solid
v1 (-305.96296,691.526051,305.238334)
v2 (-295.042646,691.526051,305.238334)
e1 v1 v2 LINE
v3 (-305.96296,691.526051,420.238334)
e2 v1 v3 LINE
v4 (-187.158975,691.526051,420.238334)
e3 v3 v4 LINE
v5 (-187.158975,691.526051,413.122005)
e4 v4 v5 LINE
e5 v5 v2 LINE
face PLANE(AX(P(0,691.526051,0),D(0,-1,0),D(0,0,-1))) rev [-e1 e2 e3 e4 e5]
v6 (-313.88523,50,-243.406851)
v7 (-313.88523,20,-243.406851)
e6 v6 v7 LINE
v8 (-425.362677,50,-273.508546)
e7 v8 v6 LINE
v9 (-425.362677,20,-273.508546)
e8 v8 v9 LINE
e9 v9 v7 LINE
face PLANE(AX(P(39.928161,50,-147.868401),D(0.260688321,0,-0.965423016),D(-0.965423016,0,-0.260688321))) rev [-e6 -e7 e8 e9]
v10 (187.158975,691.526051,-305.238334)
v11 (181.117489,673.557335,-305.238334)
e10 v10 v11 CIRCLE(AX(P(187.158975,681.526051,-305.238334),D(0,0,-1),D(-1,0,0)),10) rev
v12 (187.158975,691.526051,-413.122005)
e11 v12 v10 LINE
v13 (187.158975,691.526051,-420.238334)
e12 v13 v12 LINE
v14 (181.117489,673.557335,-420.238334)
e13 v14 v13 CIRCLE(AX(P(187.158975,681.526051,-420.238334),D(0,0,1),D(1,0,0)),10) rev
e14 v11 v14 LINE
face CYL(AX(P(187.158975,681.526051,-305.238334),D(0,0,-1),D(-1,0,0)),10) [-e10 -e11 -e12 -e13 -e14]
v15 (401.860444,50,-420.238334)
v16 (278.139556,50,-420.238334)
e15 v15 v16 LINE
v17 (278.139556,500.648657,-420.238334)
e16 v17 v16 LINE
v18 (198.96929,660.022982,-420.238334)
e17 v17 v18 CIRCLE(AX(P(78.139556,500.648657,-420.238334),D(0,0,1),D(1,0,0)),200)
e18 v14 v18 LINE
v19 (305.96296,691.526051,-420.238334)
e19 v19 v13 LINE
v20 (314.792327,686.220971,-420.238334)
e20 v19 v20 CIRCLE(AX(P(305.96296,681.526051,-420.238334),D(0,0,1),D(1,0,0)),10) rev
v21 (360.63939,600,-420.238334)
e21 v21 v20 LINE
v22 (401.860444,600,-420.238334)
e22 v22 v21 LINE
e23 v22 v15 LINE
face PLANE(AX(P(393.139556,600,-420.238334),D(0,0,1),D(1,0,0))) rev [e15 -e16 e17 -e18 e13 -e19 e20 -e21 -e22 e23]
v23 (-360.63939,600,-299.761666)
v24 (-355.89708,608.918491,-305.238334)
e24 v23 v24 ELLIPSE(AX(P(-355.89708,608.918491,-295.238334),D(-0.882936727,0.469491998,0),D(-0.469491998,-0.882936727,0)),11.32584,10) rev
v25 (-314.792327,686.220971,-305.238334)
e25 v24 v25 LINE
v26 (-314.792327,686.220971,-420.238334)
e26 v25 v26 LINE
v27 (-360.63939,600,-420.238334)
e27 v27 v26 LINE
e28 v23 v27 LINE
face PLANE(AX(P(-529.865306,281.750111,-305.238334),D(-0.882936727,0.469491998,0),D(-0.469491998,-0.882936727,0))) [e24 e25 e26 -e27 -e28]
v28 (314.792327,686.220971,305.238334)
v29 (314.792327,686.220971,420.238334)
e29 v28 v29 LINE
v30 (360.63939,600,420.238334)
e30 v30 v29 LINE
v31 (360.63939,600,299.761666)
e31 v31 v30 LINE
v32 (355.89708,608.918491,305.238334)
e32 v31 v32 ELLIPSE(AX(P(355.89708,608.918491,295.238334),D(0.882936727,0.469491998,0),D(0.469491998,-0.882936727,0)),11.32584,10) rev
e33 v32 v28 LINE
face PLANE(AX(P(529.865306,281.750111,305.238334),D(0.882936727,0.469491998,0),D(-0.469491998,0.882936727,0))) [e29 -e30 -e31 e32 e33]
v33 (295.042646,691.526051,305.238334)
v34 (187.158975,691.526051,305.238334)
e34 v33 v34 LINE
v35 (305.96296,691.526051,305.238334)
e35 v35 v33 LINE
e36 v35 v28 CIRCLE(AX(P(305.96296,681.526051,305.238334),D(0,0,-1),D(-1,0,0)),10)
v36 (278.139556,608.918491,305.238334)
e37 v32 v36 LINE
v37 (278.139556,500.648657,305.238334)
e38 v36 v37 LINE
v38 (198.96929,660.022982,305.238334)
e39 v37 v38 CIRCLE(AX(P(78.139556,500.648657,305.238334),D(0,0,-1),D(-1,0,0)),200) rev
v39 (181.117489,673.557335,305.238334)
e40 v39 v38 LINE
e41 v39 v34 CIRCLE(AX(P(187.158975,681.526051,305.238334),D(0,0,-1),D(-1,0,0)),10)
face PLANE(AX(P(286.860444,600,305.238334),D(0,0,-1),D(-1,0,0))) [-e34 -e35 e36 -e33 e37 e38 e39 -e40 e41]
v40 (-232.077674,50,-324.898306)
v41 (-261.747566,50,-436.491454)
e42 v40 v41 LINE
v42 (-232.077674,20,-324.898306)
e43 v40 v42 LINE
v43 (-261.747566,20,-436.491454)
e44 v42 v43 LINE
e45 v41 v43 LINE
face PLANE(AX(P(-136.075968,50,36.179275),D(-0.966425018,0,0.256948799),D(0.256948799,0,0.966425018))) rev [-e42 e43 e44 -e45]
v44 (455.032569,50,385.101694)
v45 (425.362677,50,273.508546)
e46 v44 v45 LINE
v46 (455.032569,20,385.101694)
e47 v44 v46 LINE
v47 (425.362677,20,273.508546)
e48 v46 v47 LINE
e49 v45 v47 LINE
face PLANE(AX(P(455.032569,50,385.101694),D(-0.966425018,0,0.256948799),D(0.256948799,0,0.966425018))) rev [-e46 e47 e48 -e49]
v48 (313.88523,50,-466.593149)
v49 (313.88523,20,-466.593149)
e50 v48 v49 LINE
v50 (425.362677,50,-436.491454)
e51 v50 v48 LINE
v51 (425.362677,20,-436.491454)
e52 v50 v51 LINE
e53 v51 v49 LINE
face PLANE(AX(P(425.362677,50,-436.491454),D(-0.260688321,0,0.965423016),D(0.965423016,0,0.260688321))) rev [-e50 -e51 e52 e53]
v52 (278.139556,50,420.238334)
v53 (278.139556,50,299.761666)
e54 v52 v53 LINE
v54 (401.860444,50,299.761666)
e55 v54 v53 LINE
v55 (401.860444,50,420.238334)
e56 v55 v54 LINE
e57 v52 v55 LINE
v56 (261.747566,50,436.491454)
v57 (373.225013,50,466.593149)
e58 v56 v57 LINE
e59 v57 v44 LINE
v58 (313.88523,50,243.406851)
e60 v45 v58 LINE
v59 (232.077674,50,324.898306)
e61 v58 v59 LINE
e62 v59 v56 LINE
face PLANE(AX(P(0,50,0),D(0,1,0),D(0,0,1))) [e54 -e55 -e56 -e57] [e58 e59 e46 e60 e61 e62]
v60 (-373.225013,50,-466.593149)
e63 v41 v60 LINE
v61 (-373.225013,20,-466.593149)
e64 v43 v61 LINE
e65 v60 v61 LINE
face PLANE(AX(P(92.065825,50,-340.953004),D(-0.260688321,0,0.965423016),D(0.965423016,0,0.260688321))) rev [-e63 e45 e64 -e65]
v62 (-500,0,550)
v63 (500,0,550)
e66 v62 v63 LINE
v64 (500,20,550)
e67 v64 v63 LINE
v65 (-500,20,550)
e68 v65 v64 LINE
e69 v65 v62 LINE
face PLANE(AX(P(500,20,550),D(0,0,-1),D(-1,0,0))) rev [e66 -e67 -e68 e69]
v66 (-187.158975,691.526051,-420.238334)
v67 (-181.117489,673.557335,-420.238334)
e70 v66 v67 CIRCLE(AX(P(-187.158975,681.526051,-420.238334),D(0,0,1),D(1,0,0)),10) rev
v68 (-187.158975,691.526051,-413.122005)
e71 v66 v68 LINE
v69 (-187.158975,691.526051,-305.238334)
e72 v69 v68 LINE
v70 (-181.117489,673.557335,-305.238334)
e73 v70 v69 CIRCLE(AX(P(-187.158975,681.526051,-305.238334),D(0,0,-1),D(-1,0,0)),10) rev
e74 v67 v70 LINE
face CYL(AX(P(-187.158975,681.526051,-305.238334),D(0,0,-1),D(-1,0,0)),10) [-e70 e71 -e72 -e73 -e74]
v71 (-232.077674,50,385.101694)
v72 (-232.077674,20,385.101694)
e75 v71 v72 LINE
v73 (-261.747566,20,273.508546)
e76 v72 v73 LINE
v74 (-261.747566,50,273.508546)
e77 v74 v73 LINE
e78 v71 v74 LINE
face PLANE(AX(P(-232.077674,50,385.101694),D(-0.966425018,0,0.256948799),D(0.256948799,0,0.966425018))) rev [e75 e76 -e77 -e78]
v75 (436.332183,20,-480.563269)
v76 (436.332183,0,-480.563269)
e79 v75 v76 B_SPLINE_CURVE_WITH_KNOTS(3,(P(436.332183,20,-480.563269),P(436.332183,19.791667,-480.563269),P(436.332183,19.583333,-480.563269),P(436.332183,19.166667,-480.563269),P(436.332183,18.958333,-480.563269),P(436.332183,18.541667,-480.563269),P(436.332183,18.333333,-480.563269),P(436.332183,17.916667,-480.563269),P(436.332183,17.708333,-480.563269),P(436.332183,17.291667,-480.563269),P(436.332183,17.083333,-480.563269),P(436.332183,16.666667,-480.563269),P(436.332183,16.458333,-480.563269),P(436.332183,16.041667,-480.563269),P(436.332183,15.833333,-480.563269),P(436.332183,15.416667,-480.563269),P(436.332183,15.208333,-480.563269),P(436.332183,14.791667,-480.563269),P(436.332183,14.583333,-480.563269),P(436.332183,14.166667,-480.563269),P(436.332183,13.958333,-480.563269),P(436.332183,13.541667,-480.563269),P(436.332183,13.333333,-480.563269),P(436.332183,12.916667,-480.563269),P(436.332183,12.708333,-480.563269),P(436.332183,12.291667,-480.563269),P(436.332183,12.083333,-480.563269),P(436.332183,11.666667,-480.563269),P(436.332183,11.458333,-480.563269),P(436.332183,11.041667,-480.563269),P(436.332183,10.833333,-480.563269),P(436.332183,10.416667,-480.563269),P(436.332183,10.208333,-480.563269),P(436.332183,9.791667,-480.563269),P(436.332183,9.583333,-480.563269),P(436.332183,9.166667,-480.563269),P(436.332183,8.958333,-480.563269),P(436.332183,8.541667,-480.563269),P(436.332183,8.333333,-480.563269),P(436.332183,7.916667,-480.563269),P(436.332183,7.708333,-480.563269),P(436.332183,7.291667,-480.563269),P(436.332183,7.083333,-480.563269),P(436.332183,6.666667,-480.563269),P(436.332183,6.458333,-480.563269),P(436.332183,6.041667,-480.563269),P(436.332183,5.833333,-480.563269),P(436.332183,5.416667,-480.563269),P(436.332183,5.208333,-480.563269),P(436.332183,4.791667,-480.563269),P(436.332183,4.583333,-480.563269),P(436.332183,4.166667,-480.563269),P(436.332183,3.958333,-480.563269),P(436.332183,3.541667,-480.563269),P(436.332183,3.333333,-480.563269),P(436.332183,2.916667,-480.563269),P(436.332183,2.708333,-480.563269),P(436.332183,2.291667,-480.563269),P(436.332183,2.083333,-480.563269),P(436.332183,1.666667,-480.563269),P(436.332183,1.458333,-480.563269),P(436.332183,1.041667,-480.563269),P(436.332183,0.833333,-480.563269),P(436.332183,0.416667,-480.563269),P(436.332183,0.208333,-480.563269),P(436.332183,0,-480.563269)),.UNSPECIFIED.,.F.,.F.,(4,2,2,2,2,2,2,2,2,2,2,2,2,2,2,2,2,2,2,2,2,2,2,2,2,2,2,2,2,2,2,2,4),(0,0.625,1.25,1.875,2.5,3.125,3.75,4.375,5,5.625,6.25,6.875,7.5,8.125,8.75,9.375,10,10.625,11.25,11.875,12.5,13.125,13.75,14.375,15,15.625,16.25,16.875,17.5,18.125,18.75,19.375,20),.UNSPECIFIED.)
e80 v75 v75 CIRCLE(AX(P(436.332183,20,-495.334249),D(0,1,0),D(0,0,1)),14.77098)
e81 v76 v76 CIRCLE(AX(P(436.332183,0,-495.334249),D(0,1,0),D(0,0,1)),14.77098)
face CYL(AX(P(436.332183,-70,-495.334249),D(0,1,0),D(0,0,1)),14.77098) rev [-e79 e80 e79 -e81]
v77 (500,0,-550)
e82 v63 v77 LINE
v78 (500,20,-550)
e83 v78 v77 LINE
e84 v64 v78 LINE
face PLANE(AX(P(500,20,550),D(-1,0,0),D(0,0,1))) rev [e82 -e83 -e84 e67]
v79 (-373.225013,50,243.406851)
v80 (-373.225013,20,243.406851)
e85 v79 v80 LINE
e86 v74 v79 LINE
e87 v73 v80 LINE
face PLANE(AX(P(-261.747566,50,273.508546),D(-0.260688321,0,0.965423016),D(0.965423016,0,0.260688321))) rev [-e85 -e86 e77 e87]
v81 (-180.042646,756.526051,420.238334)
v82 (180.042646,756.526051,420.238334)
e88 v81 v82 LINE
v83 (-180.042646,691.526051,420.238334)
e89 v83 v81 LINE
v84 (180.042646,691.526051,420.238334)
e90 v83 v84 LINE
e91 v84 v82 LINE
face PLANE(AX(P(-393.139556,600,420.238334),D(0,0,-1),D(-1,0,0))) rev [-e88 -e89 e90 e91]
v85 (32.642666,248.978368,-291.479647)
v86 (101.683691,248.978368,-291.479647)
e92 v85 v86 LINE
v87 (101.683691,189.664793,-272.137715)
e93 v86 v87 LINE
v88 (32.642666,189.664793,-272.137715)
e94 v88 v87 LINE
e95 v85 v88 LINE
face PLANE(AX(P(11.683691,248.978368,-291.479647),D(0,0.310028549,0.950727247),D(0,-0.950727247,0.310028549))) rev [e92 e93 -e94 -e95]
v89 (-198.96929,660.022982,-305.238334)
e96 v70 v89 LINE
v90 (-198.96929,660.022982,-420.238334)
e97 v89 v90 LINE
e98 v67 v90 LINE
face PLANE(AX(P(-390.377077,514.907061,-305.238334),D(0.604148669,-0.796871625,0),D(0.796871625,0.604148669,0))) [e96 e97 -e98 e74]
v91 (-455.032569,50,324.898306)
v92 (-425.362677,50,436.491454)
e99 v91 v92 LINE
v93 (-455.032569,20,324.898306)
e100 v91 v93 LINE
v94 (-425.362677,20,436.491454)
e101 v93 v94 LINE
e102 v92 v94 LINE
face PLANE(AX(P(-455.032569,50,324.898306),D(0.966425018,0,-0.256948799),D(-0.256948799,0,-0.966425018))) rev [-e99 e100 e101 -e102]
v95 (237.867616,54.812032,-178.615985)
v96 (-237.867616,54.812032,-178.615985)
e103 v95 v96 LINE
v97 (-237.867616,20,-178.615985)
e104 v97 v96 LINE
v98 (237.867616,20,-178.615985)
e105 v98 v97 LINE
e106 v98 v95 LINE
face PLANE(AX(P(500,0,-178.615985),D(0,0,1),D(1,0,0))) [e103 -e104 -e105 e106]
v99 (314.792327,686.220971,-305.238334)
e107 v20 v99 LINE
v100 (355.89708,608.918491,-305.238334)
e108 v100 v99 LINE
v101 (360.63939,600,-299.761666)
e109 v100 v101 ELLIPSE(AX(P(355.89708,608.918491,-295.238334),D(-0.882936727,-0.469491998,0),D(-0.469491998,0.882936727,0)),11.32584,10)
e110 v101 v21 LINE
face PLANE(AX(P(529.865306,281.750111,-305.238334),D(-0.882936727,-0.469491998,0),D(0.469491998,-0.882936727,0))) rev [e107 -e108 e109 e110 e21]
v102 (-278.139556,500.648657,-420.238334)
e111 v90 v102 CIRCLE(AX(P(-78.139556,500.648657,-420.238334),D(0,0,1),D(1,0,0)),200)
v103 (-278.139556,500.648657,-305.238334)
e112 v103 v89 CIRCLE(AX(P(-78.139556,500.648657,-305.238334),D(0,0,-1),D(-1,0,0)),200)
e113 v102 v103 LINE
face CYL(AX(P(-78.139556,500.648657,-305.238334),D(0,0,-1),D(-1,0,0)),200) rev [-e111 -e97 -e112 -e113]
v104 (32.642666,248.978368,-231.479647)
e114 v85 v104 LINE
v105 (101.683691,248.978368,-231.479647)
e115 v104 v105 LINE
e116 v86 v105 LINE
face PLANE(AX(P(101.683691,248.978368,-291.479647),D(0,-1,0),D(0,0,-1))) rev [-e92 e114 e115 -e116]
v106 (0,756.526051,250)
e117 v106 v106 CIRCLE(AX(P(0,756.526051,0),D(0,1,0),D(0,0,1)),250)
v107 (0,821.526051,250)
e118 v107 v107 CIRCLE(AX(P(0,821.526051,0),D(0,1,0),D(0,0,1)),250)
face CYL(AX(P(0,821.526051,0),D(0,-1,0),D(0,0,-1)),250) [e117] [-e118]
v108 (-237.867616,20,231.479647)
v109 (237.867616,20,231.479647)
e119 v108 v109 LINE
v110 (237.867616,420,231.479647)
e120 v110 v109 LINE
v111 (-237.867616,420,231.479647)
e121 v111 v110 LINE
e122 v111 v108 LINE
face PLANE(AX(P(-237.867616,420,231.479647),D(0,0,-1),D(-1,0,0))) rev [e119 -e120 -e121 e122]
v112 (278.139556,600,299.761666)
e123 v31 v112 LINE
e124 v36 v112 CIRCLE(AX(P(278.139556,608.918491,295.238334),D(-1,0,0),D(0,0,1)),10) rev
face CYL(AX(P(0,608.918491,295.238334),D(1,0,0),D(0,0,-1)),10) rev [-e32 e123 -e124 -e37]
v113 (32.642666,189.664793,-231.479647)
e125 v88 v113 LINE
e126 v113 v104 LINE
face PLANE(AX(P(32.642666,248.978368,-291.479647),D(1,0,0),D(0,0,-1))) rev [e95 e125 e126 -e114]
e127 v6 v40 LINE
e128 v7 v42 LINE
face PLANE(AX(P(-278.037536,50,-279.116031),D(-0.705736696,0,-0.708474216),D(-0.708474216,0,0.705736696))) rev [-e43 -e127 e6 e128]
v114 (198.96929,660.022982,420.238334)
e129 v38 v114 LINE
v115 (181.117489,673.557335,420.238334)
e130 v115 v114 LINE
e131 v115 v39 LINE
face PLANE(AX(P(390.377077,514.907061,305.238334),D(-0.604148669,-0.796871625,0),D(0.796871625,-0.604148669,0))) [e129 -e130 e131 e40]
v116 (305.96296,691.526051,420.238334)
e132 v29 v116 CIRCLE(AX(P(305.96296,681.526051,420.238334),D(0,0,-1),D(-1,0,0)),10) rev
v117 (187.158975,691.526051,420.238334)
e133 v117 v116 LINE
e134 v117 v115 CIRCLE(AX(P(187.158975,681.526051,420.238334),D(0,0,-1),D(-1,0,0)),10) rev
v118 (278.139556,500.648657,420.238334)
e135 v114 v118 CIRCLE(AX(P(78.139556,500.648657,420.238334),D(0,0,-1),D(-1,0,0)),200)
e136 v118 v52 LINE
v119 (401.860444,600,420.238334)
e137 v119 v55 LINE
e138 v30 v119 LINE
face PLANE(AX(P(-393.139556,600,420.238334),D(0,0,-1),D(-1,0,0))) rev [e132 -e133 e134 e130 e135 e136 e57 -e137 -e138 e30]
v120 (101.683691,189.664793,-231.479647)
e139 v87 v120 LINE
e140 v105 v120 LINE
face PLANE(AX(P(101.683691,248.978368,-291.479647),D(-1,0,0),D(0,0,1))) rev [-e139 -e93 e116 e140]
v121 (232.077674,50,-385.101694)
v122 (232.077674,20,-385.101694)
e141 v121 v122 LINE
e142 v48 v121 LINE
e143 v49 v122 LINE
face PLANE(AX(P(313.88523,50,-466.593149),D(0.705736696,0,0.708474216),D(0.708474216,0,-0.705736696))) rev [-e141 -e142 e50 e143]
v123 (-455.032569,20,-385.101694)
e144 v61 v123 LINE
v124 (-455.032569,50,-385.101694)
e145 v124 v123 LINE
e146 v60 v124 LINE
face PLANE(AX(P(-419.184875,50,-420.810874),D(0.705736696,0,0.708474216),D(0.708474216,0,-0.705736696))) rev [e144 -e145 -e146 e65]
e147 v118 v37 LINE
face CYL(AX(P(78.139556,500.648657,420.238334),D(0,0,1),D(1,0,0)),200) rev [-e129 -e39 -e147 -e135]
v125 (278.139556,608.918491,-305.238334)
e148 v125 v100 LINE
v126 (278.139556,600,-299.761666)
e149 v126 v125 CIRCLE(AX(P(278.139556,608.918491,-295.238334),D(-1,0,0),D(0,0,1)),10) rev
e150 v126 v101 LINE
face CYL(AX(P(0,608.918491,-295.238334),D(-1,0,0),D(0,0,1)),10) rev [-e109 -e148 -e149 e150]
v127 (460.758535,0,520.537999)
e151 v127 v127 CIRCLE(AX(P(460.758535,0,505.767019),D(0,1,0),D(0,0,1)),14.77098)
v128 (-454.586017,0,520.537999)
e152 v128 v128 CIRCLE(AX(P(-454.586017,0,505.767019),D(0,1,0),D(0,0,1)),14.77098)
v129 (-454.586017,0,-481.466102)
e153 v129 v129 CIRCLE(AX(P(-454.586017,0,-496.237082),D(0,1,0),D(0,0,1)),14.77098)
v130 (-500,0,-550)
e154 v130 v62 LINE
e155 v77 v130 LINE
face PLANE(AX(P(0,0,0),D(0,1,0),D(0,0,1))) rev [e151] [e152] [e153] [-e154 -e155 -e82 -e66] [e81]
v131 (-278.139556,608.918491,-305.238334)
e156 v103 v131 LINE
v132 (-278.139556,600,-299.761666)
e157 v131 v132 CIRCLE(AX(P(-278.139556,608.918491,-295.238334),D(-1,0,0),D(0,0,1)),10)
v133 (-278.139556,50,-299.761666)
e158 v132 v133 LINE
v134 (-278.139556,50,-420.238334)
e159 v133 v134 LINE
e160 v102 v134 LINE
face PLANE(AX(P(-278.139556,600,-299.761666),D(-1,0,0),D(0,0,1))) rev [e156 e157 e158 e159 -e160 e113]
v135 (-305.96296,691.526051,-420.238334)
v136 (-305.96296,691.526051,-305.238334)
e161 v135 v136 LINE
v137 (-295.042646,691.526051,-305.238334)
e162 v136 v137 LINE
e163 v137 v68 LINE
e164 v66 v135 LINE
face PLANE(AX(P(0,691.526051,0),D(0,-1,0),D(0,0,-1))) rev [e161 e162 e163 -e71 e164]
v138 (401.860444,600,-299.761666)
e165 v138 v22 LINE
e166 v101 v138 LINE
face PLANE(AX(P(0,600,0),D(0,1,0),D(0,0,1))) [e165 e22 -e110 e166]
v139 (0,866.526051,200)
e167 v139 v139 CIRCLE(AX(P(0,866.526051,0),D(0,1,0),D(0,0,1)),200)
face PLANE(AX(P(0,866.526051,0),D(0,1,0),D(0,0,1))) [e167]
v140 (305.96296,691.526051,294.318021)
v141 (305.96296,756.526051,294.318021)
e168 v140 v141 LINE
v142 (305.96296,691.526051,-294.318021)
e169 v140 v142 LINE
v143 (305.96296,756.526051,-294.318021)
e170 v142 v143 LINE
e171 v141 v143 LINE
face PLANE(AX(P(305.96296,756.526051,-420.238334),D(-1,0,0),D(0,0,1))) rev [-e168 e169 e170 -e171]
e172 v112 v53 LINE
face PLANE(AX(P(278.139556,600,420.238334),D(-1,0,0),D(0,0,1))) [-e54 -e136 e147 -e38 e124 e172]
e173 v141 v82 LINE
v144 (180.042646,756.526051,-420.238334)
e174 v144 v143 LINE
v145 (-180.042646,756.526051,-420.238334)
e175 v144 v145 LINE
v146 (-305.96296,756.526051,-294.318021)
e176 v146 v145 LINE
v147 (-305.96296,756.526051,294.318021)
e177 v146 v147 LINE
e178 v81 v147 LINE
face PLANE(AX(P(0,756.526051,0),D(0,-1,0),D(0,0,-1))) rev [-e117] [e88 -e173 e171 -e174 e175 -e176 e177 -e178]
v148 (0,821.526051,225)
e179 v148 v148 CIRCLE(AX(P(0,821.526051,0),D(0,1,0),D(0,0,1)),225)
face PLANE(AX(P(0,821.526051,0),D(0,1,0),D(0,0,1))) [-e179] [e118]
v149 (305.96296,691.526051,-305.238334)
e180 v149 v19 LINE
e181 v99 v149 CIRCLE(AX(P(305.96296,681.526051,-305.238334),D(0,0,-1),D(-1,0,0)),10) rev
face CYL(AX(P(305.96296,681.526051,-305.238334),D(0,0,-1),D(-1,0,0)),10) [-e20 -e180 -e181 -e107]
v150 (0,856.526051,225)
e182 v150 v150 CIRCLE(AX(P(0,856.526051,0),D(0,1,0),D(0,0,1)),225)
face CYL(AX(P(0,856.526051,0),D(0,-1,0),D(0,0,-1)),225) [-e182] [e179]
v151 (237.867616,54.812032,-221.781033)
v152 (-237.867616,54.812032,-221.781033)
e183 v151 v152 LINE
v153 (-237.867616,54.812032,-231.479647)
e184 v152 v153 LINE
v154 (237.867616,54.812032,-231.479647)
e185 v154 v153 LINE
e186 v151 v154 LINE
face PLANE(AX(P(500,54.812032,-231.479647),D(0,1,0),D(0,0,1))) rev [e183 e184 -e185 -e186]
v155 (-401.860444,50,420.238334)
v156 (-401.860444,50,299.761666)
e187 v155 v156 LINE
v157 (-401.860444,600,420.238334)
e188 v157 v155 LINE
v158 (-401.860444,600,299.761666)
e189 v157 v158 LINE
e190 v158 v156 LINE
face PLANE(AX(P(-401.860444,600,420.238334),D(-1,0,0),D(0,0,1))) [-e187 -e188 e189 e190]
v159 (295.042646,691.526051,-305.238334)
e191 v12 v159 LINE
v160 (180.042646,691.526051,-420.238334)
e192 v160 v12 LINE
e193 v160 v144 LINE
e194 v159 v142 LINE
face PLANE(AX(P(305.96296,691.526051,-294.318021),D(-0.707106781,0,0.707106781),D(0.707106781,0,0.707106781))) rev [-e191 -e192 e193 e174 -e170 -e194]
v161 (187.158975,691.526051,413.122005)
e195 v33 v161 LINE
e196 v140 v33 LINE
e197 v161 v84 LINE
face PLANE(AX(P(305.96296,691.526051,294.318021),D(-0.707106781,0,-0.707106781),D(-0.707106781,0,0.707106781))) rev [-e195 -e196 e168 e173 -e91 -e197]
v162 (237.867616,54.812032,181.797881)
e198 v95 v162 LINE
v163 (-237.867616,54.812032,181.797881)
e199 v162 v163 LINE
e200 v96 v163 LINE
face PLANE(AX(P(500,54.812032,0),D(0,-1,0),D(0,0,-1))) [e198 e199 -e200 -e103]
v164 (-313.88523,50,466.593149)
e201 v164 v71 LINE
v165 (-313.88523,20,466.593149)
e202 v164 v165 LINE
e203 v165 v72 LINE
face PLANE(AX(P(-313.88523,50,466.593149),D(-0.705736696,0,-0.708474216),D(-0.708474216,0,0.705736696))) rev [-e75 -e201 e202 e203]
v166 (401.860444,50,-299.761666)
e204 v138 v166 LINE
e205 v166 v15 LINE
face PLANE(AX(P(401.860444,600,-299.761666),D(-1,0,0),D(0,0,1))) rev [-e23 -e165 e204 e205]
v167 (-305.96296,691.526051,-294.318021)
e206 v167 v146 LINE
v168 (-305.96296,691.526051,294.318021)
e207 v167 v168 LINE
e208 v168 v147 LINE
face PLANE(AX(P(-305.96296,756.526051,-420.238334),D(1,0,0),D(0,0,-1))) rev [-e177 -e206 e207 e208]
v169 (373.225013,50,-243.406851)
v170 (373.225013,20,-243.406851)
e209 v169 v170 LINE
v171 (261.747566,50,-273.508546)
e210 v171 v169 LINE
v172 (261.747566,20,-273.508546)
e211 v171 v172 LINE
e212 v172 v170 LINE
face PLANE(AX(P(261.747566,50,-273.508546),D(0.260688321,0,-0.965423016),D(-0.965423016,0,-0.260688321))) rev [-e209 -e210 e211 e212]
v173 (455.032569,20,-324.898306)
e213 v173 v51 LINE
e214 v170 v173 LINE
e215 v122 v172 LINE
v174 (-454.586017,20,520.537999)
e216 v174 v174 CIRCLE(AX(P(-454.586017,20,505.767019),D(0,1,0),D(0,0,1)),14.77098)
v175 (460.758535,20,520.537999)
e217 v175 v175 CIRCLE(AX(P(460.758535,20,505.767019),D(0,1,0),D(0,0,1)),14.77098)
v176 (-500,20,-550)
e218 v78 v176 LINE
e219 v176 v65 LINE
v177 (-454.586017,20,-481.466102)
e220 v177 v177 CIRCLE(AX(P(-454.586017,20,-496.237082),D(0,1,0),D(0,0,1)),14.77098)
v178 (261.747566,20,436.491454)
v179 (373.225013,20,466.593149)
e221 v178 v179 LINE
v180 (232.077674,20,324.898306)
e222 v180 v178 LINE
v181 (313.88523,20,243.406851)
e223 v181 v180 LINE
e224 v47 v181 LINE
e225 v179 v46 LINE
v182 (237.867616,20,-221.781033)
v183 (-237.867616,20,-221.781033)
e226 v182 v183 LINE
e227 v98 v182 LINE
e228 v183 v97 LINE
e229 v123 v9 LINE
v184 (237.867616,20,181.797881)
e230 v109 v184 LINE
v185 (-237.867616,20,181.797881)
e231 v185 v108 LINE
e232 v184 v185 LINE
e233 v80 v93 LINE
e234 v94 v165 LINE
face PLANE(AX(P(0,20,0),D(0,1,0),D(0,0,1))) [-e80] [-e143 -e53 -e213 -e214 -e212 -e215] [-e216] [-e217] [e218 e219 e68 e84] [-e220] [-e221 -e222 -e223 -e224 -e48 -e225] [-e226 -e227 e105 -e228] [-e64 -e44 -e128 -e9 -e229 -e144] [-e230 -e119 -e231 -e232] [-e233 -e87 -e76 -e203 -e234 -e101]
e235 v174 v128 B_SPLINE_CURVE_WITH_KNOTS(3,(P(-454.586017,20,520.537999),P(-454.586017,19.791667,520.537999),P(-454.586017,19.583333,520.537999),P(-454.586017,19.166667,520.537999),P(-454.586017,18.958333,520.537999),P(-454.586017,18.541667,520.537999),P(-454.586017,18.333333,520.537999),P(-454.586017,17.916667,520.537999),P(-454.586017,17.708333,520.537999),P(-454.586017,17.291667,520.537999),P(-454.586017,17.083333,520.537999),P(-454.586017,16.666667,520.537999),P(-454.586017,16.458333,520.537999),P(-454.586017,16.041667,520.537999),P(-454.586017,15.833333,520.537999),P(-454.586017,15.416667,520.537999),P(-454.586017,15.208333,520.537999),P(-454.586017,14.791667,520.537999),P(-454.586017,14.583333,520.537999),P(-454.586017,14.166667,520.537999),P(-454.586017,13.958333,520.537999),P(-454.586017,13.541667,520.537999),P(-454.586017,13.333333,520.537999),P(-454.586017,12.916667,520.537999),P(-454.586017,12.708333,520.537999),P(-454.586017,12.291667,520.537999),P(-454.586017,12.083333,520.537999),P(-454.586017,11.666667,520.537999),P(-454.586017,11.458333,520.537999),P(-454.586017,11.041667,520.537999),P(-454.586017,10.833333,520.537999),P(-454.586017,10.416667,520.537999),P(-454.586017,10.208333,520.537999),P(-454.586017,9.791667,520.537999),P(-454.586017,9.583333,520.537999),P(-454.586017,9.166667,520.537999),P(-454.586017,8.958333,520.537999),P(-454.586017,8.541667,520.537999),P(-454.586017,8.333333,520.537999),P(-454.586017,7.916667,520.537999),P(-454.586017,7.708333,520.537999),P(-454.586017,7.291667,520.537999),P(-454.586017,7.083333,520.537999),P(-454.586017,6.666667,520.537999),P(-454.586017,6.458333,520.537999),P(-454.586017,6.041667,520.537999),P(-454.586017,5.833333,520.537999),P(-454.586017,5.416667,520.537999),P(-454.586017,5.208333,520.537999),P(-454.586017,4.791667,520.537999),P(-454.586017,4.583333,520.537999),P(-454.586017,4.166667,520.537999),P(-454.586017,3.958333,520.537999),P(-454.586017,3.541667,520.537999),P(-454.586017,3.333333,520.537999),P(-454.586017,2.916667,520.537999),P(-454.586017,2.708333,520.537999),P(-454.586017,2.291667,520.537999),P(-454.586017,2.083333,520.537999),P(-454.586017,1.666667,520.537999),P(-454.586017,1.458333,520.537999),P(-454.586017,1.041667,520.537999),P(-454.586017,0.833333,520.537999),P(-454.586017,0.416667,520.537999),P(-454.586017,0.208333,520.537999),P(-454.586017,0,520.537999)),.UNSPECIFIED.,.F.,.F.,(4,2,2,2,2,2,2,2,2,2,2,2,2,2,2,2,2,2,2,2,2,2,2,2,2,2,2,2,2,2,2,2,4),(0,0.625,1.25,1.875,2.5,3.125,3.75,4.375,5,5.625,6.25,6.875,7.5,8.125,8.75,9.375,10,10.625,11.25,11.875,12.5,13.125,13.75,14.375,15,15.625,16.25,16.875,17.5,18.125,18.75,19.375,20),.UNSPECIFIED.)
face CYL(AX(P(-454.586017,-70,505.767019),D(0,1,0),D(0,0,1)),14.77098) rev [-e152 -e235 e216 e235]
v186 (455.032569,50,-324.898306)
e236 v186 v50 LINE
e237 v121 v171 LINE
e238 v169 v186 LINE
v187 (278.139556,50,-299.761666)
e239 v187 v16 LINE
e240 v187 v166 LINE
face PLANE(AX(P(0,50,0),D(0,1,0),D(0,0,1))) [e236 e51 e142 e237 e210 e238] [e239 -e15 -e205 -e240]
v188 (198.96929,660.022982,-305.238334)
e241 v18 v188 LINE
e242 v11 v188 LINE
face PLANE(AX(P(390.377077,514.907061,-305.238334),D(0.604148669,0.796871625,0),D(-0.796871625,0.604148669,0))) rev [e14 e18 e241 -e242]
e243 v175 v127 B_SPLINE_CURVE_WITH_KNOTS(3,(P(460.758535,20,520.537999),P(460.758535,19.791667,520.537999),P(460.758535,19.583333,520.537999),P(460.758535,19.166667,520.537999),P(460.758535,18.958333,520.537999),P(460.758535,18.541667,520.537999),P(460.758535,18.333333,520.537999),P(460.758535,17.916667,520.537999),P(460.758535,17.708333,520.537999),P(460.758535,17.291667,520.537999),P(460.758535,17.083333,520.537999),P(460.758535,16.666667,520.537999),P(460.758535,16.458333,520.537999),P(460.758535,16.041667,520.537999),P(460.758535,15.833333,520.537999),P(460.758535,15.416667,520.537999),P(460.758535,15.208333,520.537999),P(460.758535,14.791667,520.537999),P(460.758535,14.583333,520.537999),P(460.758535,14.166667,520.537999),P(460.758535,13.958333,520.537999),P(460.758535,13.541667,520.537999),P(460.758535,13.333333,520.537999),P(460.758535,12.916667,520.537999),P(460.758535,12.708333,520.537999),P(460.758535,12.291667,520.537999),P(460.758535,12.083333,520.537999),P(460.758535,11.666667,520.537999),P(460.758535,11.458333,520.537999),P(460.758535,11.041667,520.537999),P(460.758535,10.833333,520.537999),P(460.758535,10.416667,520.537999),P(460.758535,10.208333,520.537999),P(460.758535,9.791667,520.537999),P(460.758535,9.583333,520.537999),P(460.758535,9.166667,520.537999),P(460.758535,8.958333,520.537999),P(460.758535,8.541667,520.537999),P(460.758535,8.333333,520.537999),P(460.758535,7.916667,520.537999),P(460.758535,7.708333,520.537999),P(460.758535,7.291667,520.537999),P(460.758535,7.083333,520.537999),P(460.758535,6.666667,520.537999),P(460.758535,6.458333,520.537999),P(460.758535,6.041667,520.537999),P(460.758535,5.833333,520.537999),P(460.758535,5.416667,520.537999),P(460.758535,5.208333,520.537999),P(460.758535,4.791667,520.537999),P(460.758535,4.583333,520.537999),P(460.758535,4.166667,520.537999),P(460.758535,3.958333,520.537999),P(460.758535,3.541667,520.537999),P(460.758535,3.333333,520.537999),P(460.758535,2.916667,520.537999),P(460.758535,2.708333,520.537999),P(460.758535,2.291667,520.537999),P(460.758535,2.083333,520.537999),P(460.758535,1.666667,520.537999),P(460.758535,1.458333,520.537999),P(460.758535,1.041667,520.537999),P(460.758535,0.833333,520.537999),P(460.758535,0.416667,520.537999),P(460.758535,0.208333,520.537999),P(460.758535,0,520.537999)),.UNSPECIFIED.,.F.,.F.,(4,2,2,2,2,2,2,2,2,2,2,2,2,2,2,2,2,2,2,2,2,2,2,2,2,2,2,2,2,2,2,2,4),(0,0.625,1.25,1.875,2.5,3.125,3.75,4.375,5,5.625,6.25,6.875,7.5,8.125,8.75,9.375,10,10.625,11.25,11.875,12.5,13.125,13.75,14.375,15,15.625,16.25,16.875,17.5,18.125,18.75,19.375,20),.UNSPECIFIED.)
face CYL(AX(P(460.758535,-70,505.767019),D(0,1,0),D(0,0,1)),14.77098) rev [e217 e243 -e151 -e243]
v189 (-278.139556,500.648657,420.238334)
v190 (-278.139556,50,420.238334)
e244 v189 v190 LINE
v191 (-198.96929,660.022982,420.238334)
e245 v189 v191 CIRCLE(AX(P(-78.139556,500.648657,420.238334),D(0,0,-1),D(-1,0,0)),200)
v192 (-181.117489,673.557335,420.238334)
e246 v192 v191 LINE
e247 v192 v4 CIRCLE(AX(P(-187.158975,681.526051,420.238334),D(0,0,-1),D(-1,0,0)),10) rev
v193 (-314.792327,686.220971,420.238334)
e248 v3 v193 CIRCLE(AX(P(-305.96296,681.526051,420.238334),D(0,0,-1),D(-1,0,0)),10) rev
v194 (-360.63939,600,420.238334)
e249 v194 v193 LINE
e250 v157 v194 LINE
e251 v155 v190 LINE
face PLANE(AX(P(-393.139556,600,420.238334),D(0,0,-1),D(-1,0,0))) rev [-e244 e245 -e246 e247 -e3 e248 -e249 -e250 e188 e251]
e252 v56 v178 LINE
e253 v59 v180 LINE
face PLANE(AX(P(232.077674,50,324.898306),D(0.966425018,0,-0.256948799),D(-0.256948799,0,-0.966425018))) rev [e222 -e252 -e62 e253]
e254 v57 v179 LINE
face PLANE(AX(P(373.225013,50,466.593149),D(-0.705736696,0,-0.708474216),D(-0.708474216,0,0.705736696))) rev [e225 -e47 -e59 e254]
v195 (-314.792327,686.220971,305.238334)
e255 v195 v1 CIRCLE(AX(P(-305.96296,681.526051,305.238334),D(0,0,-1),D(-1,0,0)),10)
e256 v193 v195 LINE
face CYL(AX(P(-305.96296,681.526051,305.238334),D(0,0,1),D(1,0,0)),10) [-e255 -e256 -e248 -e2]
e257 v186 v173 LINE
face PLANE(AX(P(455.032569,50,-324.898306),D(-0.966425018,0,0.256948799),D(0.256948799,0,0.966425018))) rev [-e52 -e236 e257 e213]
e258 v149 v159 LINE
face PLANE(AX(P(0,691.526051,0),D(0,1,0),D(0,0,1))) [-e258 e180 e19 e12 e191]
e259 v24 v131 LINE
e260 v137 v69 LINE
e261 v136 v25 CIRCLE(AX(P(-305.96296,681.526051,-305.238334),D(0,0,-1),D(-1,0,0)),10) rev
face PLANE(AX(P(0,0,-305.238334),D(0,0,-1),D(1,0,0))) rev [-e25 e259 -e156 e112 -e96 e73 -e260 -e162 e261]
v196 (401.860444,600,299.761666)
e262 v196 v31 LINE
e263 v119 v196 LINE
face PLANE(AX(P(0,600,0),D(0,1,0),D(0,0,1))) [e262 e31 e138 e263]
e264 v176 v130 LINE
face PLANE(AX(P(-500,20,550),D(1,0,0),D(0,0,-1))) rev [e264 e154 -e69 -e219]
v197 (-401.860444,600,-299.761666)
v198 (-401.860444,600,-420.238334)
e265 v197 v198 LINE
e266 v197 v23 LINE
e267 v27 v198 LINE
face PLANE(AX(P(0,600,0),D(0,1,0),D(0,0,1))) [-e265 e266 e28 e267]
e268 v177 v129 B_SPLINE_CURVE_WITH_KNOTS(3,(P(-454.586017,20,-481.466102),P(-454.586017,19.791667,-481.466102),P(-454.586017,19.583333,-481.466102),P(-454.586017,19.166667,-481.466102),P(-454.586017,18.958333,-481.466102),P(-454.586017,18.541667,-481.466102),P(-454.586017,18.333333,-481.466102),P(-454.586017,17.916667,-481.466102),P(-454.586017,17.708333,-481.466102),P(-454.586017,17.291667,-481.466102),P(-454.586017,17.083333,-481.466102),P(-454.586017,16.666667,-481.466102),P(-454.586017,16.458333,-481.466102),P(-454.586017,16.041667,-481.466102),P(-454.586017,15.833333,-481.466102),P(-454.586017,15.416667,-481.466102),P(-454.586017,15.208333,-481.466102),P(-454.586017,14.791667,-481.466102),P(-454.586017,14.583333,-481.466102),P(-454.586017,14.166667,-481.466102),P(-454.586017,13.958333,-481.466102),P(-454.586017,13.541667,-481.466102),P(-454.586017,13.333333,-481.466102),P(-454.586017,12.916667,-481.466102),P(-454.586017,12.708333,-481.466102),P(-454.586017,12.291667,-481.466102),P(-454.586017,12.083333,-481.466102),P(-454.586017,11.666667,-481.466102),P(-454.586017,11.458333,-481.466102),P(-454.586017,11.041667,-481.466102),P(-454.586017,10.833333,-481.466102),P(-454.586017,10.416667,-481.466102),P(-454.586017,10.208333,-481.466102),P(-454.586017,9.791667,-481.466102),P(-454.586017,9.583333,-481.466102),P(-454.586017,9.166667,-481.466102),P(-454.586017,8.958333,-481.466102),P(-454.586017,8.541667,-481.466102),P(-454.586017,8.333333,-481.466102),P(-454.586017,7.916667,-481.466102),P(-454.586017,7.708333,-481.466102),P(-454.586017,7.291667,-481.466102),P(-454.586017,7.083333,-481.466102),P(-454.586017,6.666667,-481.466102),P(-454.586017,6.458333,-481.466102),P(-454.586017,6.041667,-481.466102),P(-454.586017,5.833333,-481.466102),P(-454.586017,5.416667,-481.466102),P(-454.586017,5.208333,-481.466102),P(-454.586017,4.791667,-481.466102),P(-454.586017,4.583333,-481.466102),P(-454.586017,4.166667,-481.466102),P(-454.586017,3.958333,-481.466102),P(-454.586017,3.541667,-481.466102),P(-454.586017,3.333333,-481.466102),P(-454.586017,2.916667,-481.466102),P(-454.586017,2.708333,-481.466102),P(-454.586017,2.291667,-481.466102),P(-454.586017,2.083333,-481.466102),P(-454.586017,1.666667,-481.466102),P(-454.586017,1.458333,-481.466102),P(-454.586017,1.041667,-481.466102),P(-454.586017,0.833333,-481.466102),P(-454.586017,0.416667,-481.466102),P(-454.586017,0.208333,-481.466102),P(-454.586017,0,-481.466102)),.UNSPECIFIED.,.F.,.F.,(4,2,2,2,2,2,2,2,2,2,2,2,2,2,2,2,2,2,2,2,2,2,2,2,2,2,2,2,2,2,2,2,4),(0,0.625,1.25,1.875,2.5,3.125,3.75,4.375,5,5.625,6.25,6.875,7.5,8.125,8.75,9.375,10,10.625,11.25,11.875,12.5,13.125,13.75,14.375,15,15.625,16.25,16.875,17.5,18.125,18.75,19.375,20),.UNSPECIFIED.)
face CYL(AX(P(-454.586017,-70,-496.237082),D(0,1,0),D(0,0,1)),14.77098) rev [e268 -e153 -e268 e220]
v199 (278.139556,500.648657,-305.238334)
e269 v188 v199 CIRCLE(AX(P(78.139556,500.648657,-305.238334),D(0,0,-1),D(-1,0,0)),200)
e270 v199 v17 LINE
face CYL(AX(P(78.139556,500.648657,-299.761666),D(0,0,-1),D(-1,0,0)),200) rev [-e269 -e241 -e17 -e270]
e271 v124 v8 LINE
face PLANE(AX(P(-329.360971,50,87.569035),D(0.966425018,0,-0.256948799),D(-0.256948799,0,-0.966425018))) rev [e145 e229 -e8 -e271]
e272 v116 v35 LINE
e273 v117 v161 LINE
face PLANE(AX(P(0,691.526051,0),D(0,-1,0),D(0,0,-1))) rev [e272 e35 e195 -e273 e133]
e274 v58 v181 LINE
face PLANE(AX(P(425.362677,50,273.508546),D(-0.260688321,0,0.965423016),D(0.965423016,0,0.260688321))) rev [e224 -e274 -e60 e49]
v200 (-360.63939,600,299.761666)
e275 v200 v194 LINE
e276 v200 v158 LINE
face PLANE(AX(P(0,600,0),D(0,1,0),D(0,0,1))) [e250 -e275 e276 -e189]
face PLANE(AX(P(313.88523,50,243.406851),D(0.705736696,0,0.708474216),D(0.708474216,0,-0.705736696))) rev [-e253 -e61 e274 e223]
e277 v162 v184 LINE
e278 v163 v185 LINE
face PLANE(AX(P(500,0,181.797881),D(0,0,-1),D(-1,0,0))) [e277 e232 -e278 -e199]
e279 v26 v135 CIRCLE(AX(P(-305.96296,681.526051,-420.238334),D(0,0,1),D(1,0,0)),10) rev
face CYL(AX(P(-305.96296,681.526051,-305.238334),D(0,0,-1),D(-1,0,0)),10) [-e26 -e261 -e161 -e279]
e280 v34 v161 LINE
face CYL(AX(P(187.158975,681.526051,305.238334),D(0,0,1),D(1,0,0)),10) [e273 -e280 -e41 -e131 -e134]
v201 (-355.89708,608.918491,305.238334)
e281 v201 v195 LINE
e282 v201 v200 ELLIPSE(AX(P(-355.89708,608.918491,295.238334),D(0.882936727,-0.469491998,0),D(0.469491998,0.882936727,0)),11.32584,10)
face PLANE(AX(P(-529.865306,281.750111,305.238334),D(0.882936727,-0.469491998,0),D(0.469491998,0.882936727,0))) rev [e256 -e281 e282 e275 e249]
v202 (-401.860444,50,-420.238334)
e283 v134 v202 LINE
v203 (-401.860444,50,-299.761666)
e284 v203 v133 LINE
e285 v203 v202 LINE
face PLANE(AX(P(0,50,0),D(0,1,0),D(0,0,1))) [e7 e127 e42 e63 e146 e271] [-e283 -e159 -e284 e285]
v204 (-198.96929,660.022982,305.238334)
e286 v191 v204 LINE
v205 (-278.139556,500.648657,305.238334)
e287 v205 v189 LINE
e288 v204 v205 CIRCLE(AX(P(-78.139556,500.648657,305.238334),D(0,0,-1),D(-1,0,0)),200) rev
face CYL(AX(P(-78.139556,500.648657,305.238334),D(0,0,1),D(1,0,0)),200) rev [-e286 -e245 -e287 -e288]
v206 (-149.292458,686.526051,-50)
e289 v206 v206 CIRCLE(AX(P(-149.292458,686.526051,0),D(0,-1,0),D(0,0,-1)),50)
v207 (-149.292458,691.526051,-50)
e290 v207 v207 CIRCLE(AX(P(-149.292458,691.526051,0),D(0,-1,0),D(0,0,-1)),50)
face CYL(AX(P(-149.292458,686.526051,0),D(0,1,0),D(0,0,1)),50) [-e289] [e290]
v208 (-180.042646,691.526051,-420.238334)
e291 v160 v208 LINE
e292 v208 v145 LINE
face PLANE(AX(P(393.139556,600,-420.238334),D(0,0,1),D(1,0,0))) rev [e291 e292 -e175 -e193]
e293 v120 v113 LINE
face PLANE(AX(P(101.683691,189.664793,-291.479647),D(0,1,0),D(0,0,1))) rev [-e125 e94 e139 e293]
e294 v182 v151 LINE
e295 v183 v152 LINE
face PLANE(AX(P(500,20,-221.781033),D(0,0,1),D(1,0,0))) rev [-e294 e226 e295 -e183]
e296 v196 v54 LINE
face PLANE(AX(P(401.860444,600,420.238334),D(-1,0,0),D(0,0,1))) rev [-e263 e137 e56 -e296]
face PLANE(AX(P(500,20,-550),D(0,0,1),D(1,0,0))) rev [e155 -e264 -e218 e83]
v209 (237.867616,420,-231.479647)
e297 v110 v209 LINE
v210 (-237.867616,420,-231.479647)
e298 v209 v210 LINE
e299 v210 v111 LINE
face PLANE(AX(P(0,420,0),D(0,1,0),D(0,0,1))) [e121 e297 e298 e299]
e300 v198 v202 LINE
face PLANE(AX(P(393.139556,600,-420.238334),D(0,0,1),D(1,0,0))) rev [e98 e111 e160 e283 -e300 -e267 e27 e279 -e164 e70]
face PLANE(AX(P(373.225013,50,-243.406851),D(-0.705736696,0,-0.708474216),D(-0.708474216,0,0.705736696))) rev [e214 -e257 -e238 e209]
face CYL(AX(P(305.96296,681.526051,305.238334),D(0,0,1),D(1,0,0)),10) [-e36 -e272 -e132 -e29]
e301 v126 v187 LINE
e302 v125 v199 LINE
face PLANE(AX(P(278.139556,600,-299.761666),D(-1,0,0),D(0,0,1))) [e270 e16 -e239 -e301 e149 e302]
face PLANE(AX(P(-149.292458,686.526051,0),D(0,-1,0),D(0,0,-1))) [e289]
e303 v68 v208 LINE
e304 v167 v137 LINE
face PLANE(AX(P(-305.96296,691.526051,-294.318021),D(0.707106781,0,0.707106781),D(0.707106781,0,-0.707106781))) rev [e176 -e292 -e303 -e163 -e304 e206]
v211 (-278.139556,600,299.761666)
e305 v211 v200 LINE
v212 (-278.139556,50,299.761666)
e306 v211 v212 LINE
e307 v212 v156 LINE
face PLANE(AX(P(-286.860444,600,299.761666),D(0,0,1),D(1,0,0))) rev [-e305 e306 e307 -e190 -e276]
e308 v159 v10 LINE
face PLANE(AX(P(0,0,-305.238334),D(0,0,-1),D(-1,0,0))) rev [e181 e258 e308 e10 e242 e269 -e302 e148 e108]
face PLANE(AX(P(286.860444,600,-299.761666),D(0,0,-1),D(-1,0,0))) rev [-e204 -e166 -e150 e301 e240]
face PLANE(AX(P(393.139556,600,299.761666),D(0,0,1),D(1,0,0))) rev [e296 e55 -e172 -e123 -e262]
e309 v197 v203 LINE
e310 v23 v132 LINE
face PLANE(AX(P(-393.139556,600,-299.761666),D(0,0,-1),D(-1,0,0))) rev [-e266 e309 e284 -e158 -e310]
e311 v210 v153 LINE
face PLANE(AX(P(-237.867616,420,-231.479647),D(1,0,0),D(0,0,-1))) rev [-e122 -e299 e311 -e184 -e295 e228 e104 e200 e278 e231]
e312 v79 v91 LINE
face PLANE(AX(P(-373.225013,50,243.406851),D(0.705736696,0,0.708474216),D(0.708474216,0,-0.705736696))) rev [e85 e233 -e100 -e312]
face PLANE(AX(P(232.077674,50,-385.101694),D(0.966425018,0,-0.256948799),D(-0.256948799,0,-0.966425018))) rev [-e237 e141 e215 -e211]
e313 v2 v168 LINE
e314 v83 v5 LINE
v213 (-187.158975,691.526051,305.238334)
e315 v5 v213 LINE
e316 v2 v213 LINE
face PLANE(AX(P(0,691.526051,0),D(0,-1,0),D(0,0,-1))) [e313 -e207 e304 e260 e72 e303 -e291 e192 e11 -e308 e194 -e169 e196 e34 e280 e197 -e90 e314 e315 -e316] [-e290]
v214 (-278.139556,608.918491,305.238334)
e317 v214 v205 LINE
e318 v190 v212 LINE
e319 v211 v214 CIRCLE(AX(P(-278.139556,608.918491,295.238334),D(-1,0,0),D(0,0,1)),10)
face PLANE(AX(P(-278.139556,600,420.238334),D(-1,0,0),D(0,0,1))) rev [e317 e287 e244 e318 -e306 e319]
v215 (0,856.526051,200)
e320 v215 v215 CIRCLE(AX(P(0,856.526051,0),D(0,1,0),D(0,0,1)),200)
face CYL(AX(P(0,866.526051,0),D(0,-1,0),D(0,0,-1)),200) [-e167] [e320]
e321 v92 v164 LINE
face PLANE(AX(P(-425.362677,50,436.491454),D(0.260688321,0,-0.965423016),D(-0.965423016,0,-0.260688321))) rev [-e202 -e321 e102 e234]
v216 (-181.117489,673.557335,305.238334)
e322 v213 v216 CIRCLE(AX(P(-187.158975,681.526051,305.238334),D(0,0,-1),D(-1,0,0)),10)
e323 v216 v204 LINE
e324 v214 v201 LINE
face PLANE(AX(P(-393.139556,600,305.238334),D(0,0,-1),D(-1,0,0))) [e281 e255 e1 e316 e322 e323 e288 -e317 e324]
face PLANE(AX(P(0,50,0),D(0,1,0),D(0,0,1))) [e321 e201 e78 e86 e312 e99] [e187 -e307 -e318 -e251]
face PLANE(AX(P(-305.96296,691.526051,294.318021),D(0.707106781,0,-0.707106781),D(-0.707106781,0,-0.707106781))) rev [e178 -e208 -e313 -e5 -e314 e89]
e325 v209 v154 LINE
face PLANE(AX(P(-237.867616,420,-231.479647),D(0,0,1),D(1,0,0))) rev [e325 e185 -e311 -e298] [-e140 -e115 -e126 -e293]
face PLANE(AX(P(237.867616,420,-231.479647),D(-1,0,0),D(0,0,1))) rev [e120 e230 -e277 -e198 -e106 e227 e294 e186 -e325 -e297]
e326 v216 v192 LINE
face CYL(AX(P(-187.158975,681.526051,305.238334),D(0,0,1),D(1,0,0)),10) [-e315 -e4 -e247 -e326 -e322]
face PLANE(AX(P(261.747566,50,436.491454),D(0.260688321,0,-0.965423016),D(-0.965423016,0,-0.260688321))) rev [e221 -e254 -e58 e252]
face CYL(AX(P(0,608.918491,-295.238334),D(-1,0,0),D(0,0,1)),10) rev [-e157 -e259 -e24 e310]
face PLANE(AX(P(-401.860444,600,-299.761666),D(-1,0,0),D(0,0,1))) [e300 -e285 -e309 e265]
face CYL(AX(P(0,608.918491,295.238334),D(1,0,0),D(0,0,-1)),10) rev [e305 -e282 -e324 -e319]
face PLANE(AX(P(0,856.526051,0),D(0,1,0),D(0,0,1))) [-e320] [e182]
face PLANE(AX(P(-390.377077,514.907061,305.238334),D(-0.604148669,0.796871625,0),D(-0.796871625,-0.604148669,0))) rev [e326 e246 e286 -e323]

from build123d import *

# Parameters (mm, degrees)
SKETCH2_W            = 1000
SKETCH2_H            = 1100
BOSS_EXTRUDE1_DEPTH  = 20
BOSS_EXTRUDE2_DEPTH  = 30
SKETCH4_W            = 475.735232804
SKETCH4_H            = 462.959293972
BOSS_EXTRUDE3_DEPTH  = 400
SKETCH5_W            = 9.698613805
SKETCH5_H            = 34.812032077
CUT_EXTRUDE1_DEPTH   = 1012.606949035
SKETCH6_W            = 360.413866027
SKETCH6_H            = 34.812032077
CUT_EXTRUDE2_DEPTH   = 1012.606949035
SKETCH7_W            = 115
SKETCH7_H            = 115
BOSS_EXTRUDE4_DEPTH  = 550
BOSS_EXTRUDE6_DEPTH  = 115
FILLET3_R            = 200
FILLET5_R            = 10
FILLET6_R            = 10
FILLET3_OF_MIRROR2_R = 200
MIRROR3_START        = -420.238334409
MIRROR3_DEPTH        = 115
MIRROR3_START_2      = 299.761665591
MIRROR3_2_OUTLINE_W  = 123.720887542
MIRROR3_2_OUTLINE_H  = 550
MIRROR3_2_DEPTH      = 5.476668818
FILLET9_R            = 10
FILLET11_R           = 10
FILLET13_R           = 10
FILLET15_R           = 10
FILLET16_R           = 10
SKETCH9_W            = 611.925919606
SKETCH9_H            = 840.476668818
BOSS_EXTRUDE7_DEPTH  = 65
CUT_EXTRUDE3_DEPTH   = 65
SKETCH13_R           = 250
BOSS_EXTRUDE8_DEPTH  = 65
SKETCH14_R           = 225
BOSS_EXTRUDE9_DEPTH  = 35
SKETCH15_R           = 200
BOSS_EXTRUDE10_DEPTH = 10
SKETCH16_R           = 50
BOSS_EXTRUDE11_DEPTH = 5
SKETCH17_W           = 69.041025083
SKETCH17_H           = 59.313575352
BOSS_EXTRUDE12_DEPTH = 60
CUT_EXTRUDE4_DEPTH   = 90
SKETCH19_R           = 14.770979528
CUT_EXTRUDE5_DEPTH   = 90


# Read off the part's stored shape, not the designer's step: Mirror3
with BuildPart() as part:
    # Sketch2 → Boss-Extrude1 (new body)
    with BuildSketch(Plane(origin=(0, 0, 0), x_dir=(1, 0, 0), z_dir=(0, 1, 0))):
        Rectangle(SKETCH2_W, SKETCH2_H)
    extrude(amount=BOSS_EXTRUDE1_DEPTH)

    # Sketch3 → Boss-Extrude2 (add)
    with BuildSketch(Plane(origin=(0, 20, 0), x_dir=(1, 0, 0), z_dir=(0, 1, 0))):
        Polygon((-232.077673929, 324.898305528), (-261.747565619, 436.491454334), (-373.225013219, 466.593148806), (-455.032569128, 385.101694472), (-425.362677437, 273.508545666), (-313.885229838, 243.406851194), align=None)
        Polygon((-455.032569128, -324.898305528), (-425.362677437, -436.491454334), (-313.885229838, -466.593148806), (-232.077673929, -385.101694472), (-261.747565619, -273.508545666), (-373.225013219, -243.406851194), align=None)
        Polygon((261.747565619, -436.491454334), (373.225013219, -466.593148806), (455.032569128, -385.101694472), (425.362677437, -273.508545666), (313.885229838, -243.406851194), (232.077673929, -324.898305528), align=None)
        Polygon((261.747565619, 273.508545666), (373.225013219, 243.406851194), (455.032569128, 324.898305528), (425.362677437, 436.491454334), (313.885229838, 466.593148806), (232.077673929, 385.101694472), align=None)
    extrude(amount=BOSS_EXTRUDE2_DEPTH)

    # Sketch4 → Boss-Extrude3 (add)
    with BuildSketch(Plane(origin=(0, 20, 0), x_dir=(1, 0, 0), z_dir=(0, 1, 0))):
        Rectangle(SKETCH4_W, SKETCH4_H)
    extrude(amount=BOSS_EXTRUDE3_DEPTH)

    # Sketch5 → Cut-Extrude1 (cut, through all)
    with BuildSketch(Plane.ZY.offset(237.867616402)):
        with Locations((-226.630340084, 37.406016038)):
            Rectangle(SKETCH5_W, SKETCH5_H)
    extrude(amount=-CUT_EXTRUDE1_DEPTH, mode=Mode.SUBTRACT)

    # Sketch6 → Cut-Extrude2 (cut, through all)
    with BuildSketch(Plane.ZY.offset(237.867616402)):
        with Locations((1.590947851, 37.406016038)):
            Rectangle(SKETCH6_W, SKETCH6_H)
    extrude(amount=-CUT_EXTRUDE2_DEPTH, mode=Mode.SUBTRACT)

    # Sketch7 → Boss-Extrude4 (add)
    with BuildSketch(Plane(origin=(0, 50, 0), x_dir=(1, 0, 0), z_dir=(0, 1, 0))):
        with Locations((-335.639556229, 357.261665591)):
            Rectangle(SKETCH7_W, SKETCH7_H)
        with Locations((344.360443771, 357.261665591)):
            Rectangle(SKETCH7_W, SKETCH7_H)
        with Locations((-335.639556229, -362.738334409)):
            Rectangle(SKETCH7_W, SKETCH7_H)
        with Locations((344.360443771, -362.738334409)):
            Rectangle(SKETCH7_W, SKETCH7_H)
    boss_extrude4 = extrude(amount=BOSS_EXTRUDE4_DEPTH)

    # Sketch8 → Boss-Extrude6 (add)
    with BuildSketch(Plane.XY.offset(420.238334409)):
        Polygon((-311.971408496, 691.526051238), (-360.639390354, 600), (-278.139556229, 600), (-157.416765755, 691.526051238), align=None)
    boss_extrude6 = extrude(amount=-BOSS_EXTRUDE6_DEPTH)

    # Fillet3
    fillet3_edges = [part.edges().sort_by_distance(p)[0] for p in [
        (-278.139556229, 600, 362.738334409),
    ]]
    fillet(fillet3_edges, radius=FILLET3_R)

    # Fillet5
    fillet5_edges = [part.edges().sort_by_distance(p)[0] for p in [
        (-157.416765755, 691.526051238, 362.738334409),
    ]]
    fillet(fillet5_edges, radius=FILLET5_R)

    # Fillet6
    fillet6_edges = [part.edges().sort_by_distance(p)[0] for p in [
        (-311.971408496, 691.526051238, 362.738334409),
    ]]
    fillet(fillet6_edges, radius=FILLET6_R)

    # Mirror2: Boss-Extrude4, Boss-Extrude6 across plane
    add(boss_extrude4.mirror(Plane(origin=(0, 0, 0), x_dir=(0, 0, 1), z_dir=(1, 0, 0))))
    add(boss_extrude6.mirror(Plane(origin=(0, 0, 0), x_dir=(0, 0, 1), z_dir=(1, 0, 0))))

    # Fillet3 of Mirror2
    fillet3_of_mirror2_edges = [part.edges().sort_by_distance(p)[0] for p in [
        (278.139556229, 600, 362.738334409),
    ]]
    fillet(fillet3_of_mirror2_edges, radius=FILLET3_OF_MIRROR2_R)

    # Mirror3 outline → Mirror3 (add)
    with BuildSketch(Plane.XY.offset(MIRROR3_START)):
        with BuildLine():
            Line((-278.139556229, 50), (-278.139556229, 500.648656801))
            ThreePointArc((-278.139556229, 500.648656801), (-257.256761918, 589.626331677), (-198.969289966, 660.022981726))
            Line((-198.969289966, 660.022981726), (-157.416765755, 691.526051238))
            Line((-157.416765755, 691.526051238), (-311.971408496, 691.526051238))
            Line((-311.971408496, 691.526051238), (-360.639390354, 600))
            Line((-360.639390354, 600), (-401.860443771, 600))
            Line((-401.860443771, 600), (-401.860443771, 50))
            Line((-401.860443771, 50), (-278.139556229, 50))
        make_face()
        with BuildLine():
            Line((401.860443771, 50), (401.860443771, 600))
            Line((401.860443771, 600), (360.639390354, 600))
            Line((360.639390354, 600), (311.971408496, 691.526051238))
            Line((311.971408496, 691.526051238), (157.416765755, 691.526051238))
            Line((157.416765755, 691.526051238), (198.969289966, 660.022981726))
            ThreePointArc((198.969289966, 660.022981726), (257.256761918, 589.626331677), (278.139556229, 500.648656801))
            Line((278.139556229, 500.648656801), (278.139556229, 50))
            Line((278.139556229, 50), (401.860443771, 50))
        make_face()
    extrude(amount=MIRROR3_DEPTH)

    # Mirror3 2 outline → Mirror3 2 (add)
    with BuildSketch(Plane.XY.offset(MIRROR3_START_2)):
        with Locations((-340, 325)):
            Rectangle(MIRROR3_2_OUTLINE_W, MIRROR3_2_OUTLINE_H)
        with Locations((340, 325)):
            Rectangle(MIRROR3_2_OUTLINE_W, MIRROR3_2_OUTLINE_H)
    extrude(amount=MIRROR3_2_DEPTH)

    # Fillet9
    # the kernel refuses this fillet: 10 mm, written as the material it adds along each edge
    with BuildSketch(Plane(origin=(-278.139556229, 600, -305.238334409), x_dir=(0, 0, 1), z_dir=(-1, 0, 0))) as fillet9_piece_1_section:
        with BuildLine():
            CenterArc((10, 8.918490625), FILLET9_R, 180, 63.10652679)
            Line((0, 8.918490625), (-0.2, 8.918490625))
            Line((-0.2, 8.918490625), (-0.2, 0))
            Line((-0.2, 0), (0, -0.2))
            ThreePointArc((0, -0.2), (2.738334409, -0.2), (5.386202195, -0.178369812))
            Line((5.386202195, -0.178369812), (5.476668818, 0))
        make_face()
    fillet9_piece_1 = extrude(amount=104.796060686, mode=Mode.PRIVATE)
    fillet9_piece_1 = split(fillet9_piece_1, bisect_by=Plane(origin=(-350.518364197, 619.033819017, -303.80875695), z_dir=(0.882936727210202, -0.46949199752853876, 0)), keep=Keep.TOP, mode=Mode.PRIVATE)
    add(fillet9_piece_1)

    # Fillet11
    # the kernel refuses this fillet: 10 mm, written as the material it adds along each edge
    with BuildSketch(Plane(origin=(-278.139556229, 600, 305.238334409), x_dir=(0, 0, -1), z_dir=(-1, 0, 0))) as fillet11_piece_1_section:
        with BuildLine():
            CenterArc((10, -8.918490625), FILLET11_R, 116.89347321, 63.10652679)
            Line((0, -8.918490625), (-0.2, -8.918490625))
            Line((-0.2, -8.918490625), (-0.2, 0))
            Line((-0.2, 0), (0, 0.2))
            ThreePointArc((0, 0.2), (2.738334409, 0.2), (5.386202194, 0.178369812))
            Line((5.386202194, 0.178369812), (5.476668818, 0))
        make_face()
    fillet11_piece_1 = extrude(amount=104.796060686, mode=Mode.PRIVATE)
    fillet11_piece_1 = split(fillet11_piece_1, bisect_by=Plane(origin=(-350.518364197, 619.033819017, 303.80875695), z_dir=(0.8829367272129939, -0.4694919975232882, 0)), keep=Keep.TOP, mode=Mode.PRIVATE)
    add(fillet11_piece_1)

    # Fillet13
    # the kernel refuses this fillet: 10 mm, written as the material it adds along each edge
    with BuildSketch(Plane(origin=(278.139556229, 600, -305.238334409), x_dir=(0, 1, 0), z_dir=(1, 0, 0))) as fillet13_piece_1_section:
        with BuildLine():
            CenterArc((8.918490625, 10), FILLET13_R, 206.89347321, 63.10652679)
            Line((0, 5.476668818), (-0.178369812, 5.386202195))
            ThreePointArc((-0.178369812, 5.386202195), (-0.2, 2.738334409), (-0.2, 0))
            Line((-0.2, 0), (0, -0.2))
            Line((0, -0.2), (8.918490625, -0.2))
            Line((8.918490625, -0.2), (8.918490625, 0))
        make_face()
    fillet13_piece_1 = extrude(amount=104.796060686, mode=Mode.PRIVATE)
    fillet13_piece_1 = split(fillet13_piece_1, bisect_by=Plane(origin=(350.518364197, 619.033819017, -303.80875695), z_dir=(-0.882936727210202, -0.46949199752853876, 0)), keep=Keep.TOP, mode=Mode.PRIVATE)
    add(fillet13_piece_1)

    # Fillet15
    # the kernel refuses this fillet: 10 mm, written as the material it adds along each edge
    with BuildSketch(Plane(origin=(382.935616915, 600, 305.238334409), x_dir=(0, 0, -1), z_dir=(-1, 0, 0))) as fillet15_piece_1_section:
        with BuildLine():
            CenterArc((10, -8.918490625), FILLET15_R, 116.89347321, 63.10652679)
            Line((0, -8.918490625), (-0.2, -8.918490625))
            Line((-0.2, -8.918490625), (-0.2, 0))
            Line((-0.2, 0), (0, 0.2))
            ThreePointArc((0, 0.2), (2.738334409, 0.2), (5.386202195, 0.178369812))
            Line((5.386202195, 0.178369812), (5.476668818, 0))
        make_face()
    fillet15_piece_1 = extrude(amount=104.796060686, mode=Mode.PRIVATE)
    fillet15_piece_1 = split(fillet15_piece_1, bisect_by=Plane(origin=(350.518364197, 619.033819017, 303.80875695), z_dir=(-0.8829367272129939, -0.4694919975232882, 0)), keep=Keep.TOP, mode=Mode.PRIVATE)
    add(fillet15_piece_1)

    # Fillet16
    fillet16_edges = [part.edges().sort_by_distance(p)[0] for p in [
        (157.416765755, 691.526051238, 362.738334409),
        (311.971408496, 691.526051238, 362.738334409),
        (157.416765755, 691.526051238, -362.738334409),
        (311.971408496, 691.526051238, -362.738334409),
        (-157.416765755, 691.526051238, -362.738334409),
        (-311.971408496, 691.526051238, -362.738334409),
    ]]
    fillet(fillet16_edges, radius=FILLET16_R)

    # Sketch9 → Boss-Extrude7 (add)
    with BuildSketch(Plane(origin=(0, 691.526051238, 0), x_dir=(1, 0, 0), z_dir=(0, 1, 0))):
        Rectangle(SKETCH9_W, SKETCH9_H)
    extrude(amount=BOSS_EXTRUDE7_DEPTH)

    # Sketch12 → Cut-Extrude3 (cut)
    with BuildSketch(Plane(origin=(0, 756.526051238, 0), x_dir=(1, 0, 0), z_dir=(0, 1, 0))):
        Polygon((-305.962959803, -420.238334409), (-305.962959803, -294.318020805), (-180.042646199, -420.238334409), align=None)
        Polygon((180.042646199, 420.238334409), (305.962959803, 420.238334409), (305.962959803, 294.318020805), align=None)
        Polygon((-305.962959803, 294.318020805), (-180.042646199, 420.238334409), (-305.962959803, 420.238334409), align=None)
        Polygon((305.962959803, -294.318020805), (180.042646199, -420.238334409), (305.962959803, -420.238334409), align=None)
    extrude(amount=-CUT_EXTRUDE3_DEPTH, mode=Mode.SUBTRACT)

    # Sketch13 → Boss-Extrude8 (add)
    with BuildSketch(Plane(origin=(0, 756.526051238, 0), x_dir=(1, 0, 0), z_dir=(0, 1, 0))):
        with Locations(Location((0, 0, 0), (0, 0, 270))):
            Circle(SKETCH13_R)
    extrude(amount=BOSS_EXTRUDE8_DEPTH)

    # Sketch14 → Boss-Extrude9 (add)
    with BuildSketch(Plane(origin=(0, 821.526051238, 0), x_dir=(1, 0, 0), z_dir=(0, 1, 0))):
        with Locations(Location((0, 0, 0), (0, 0, 270))):
            Circle(SKETCH14_R)
    extrude(amount=BOSS_EXTRUDE9_DEPTH)

    # Sketch15 → Boss-Extrude10 (add)
    with BuildSketch(Plane(origin=(0, 856.526051238, 0), x_dir=(1, 0, 0), z_dir=(0, 1, 0))):
        with Locations(Location((0, 0, 0), (0, 0, 270))):
            Circle(SKETCH15_R)
    extrude(amount=BOSS_EXTRUDE10_DEPTH)

    # Sketch16 → Boss-Extrude11 (add)
    with BuildSketch(Plane.XZ.offset(-691.526051238)):
        with Locations(Location((-149.292458402, 0, 0), (0, 0, 270))):
            Circle(SKETCH16_R)
    extrude(amount=BOSS_EXTRUDE11_DEPTH)

    # Sketch17 → Boss-Extrude12 (add)
    with BuildSketch(Plane(origin=(0, 0, -231.479646986), x_dir=(-1, 0, 0), z_dir=(0, 0, -1))):
        with Locations((-67.163178289, 219.321580657)):
            Rectangle(SKETCH17_W, SKETCH17_H)
    extrude(amount=BOSS_EXTRUDE12_DEPTH)

    # Sketch18 → Cut-Extrude4 (cut)
    with BuildSketch(Plane(origin=(101.683690831, 0, 0), x_dir=(0, 0, -1), z_dir=(1, 0, 0))):
        Polygon((291.479646986, 248.978368333), (272.137715086, 189.664792981), (291.479646986, 189.664792981), align=None)
    extrude(amount=-CUT_EXTRUDE4_DEPTH, mode=Mode.SUBTRACT)

    # Sketch19 → Cut-Extrude5 (cut)
    with BuildSketch(Plane(origin=(0, 20, 0), x_dir=(1, 0, 0), z_dir=(0, 1, 0))):
        with Locations(Location((436.332182741, 495.334248605, 0), (0, 0, 270))):
            Circle(SKETCH19_R)
        with Locations(Location((-454.586016885, 496.237081752, 0), (0, 0, 270))):
            Circle(SKETCH19_R)
        with Locations(Location((-454.586016885, -505.767019401, 0), (0, 0, 270))):
            Circle(SKETCH19_R)
        with Locations(Location((460.758535381, -505.767019401, 0), (0, 0, 270))):
            Circle(SKETCH19_R)
    extrude(amount=-CUT_EXTRUDE5_DEPTH, mode=Mode.SUBTRACT)


solid = part.part
